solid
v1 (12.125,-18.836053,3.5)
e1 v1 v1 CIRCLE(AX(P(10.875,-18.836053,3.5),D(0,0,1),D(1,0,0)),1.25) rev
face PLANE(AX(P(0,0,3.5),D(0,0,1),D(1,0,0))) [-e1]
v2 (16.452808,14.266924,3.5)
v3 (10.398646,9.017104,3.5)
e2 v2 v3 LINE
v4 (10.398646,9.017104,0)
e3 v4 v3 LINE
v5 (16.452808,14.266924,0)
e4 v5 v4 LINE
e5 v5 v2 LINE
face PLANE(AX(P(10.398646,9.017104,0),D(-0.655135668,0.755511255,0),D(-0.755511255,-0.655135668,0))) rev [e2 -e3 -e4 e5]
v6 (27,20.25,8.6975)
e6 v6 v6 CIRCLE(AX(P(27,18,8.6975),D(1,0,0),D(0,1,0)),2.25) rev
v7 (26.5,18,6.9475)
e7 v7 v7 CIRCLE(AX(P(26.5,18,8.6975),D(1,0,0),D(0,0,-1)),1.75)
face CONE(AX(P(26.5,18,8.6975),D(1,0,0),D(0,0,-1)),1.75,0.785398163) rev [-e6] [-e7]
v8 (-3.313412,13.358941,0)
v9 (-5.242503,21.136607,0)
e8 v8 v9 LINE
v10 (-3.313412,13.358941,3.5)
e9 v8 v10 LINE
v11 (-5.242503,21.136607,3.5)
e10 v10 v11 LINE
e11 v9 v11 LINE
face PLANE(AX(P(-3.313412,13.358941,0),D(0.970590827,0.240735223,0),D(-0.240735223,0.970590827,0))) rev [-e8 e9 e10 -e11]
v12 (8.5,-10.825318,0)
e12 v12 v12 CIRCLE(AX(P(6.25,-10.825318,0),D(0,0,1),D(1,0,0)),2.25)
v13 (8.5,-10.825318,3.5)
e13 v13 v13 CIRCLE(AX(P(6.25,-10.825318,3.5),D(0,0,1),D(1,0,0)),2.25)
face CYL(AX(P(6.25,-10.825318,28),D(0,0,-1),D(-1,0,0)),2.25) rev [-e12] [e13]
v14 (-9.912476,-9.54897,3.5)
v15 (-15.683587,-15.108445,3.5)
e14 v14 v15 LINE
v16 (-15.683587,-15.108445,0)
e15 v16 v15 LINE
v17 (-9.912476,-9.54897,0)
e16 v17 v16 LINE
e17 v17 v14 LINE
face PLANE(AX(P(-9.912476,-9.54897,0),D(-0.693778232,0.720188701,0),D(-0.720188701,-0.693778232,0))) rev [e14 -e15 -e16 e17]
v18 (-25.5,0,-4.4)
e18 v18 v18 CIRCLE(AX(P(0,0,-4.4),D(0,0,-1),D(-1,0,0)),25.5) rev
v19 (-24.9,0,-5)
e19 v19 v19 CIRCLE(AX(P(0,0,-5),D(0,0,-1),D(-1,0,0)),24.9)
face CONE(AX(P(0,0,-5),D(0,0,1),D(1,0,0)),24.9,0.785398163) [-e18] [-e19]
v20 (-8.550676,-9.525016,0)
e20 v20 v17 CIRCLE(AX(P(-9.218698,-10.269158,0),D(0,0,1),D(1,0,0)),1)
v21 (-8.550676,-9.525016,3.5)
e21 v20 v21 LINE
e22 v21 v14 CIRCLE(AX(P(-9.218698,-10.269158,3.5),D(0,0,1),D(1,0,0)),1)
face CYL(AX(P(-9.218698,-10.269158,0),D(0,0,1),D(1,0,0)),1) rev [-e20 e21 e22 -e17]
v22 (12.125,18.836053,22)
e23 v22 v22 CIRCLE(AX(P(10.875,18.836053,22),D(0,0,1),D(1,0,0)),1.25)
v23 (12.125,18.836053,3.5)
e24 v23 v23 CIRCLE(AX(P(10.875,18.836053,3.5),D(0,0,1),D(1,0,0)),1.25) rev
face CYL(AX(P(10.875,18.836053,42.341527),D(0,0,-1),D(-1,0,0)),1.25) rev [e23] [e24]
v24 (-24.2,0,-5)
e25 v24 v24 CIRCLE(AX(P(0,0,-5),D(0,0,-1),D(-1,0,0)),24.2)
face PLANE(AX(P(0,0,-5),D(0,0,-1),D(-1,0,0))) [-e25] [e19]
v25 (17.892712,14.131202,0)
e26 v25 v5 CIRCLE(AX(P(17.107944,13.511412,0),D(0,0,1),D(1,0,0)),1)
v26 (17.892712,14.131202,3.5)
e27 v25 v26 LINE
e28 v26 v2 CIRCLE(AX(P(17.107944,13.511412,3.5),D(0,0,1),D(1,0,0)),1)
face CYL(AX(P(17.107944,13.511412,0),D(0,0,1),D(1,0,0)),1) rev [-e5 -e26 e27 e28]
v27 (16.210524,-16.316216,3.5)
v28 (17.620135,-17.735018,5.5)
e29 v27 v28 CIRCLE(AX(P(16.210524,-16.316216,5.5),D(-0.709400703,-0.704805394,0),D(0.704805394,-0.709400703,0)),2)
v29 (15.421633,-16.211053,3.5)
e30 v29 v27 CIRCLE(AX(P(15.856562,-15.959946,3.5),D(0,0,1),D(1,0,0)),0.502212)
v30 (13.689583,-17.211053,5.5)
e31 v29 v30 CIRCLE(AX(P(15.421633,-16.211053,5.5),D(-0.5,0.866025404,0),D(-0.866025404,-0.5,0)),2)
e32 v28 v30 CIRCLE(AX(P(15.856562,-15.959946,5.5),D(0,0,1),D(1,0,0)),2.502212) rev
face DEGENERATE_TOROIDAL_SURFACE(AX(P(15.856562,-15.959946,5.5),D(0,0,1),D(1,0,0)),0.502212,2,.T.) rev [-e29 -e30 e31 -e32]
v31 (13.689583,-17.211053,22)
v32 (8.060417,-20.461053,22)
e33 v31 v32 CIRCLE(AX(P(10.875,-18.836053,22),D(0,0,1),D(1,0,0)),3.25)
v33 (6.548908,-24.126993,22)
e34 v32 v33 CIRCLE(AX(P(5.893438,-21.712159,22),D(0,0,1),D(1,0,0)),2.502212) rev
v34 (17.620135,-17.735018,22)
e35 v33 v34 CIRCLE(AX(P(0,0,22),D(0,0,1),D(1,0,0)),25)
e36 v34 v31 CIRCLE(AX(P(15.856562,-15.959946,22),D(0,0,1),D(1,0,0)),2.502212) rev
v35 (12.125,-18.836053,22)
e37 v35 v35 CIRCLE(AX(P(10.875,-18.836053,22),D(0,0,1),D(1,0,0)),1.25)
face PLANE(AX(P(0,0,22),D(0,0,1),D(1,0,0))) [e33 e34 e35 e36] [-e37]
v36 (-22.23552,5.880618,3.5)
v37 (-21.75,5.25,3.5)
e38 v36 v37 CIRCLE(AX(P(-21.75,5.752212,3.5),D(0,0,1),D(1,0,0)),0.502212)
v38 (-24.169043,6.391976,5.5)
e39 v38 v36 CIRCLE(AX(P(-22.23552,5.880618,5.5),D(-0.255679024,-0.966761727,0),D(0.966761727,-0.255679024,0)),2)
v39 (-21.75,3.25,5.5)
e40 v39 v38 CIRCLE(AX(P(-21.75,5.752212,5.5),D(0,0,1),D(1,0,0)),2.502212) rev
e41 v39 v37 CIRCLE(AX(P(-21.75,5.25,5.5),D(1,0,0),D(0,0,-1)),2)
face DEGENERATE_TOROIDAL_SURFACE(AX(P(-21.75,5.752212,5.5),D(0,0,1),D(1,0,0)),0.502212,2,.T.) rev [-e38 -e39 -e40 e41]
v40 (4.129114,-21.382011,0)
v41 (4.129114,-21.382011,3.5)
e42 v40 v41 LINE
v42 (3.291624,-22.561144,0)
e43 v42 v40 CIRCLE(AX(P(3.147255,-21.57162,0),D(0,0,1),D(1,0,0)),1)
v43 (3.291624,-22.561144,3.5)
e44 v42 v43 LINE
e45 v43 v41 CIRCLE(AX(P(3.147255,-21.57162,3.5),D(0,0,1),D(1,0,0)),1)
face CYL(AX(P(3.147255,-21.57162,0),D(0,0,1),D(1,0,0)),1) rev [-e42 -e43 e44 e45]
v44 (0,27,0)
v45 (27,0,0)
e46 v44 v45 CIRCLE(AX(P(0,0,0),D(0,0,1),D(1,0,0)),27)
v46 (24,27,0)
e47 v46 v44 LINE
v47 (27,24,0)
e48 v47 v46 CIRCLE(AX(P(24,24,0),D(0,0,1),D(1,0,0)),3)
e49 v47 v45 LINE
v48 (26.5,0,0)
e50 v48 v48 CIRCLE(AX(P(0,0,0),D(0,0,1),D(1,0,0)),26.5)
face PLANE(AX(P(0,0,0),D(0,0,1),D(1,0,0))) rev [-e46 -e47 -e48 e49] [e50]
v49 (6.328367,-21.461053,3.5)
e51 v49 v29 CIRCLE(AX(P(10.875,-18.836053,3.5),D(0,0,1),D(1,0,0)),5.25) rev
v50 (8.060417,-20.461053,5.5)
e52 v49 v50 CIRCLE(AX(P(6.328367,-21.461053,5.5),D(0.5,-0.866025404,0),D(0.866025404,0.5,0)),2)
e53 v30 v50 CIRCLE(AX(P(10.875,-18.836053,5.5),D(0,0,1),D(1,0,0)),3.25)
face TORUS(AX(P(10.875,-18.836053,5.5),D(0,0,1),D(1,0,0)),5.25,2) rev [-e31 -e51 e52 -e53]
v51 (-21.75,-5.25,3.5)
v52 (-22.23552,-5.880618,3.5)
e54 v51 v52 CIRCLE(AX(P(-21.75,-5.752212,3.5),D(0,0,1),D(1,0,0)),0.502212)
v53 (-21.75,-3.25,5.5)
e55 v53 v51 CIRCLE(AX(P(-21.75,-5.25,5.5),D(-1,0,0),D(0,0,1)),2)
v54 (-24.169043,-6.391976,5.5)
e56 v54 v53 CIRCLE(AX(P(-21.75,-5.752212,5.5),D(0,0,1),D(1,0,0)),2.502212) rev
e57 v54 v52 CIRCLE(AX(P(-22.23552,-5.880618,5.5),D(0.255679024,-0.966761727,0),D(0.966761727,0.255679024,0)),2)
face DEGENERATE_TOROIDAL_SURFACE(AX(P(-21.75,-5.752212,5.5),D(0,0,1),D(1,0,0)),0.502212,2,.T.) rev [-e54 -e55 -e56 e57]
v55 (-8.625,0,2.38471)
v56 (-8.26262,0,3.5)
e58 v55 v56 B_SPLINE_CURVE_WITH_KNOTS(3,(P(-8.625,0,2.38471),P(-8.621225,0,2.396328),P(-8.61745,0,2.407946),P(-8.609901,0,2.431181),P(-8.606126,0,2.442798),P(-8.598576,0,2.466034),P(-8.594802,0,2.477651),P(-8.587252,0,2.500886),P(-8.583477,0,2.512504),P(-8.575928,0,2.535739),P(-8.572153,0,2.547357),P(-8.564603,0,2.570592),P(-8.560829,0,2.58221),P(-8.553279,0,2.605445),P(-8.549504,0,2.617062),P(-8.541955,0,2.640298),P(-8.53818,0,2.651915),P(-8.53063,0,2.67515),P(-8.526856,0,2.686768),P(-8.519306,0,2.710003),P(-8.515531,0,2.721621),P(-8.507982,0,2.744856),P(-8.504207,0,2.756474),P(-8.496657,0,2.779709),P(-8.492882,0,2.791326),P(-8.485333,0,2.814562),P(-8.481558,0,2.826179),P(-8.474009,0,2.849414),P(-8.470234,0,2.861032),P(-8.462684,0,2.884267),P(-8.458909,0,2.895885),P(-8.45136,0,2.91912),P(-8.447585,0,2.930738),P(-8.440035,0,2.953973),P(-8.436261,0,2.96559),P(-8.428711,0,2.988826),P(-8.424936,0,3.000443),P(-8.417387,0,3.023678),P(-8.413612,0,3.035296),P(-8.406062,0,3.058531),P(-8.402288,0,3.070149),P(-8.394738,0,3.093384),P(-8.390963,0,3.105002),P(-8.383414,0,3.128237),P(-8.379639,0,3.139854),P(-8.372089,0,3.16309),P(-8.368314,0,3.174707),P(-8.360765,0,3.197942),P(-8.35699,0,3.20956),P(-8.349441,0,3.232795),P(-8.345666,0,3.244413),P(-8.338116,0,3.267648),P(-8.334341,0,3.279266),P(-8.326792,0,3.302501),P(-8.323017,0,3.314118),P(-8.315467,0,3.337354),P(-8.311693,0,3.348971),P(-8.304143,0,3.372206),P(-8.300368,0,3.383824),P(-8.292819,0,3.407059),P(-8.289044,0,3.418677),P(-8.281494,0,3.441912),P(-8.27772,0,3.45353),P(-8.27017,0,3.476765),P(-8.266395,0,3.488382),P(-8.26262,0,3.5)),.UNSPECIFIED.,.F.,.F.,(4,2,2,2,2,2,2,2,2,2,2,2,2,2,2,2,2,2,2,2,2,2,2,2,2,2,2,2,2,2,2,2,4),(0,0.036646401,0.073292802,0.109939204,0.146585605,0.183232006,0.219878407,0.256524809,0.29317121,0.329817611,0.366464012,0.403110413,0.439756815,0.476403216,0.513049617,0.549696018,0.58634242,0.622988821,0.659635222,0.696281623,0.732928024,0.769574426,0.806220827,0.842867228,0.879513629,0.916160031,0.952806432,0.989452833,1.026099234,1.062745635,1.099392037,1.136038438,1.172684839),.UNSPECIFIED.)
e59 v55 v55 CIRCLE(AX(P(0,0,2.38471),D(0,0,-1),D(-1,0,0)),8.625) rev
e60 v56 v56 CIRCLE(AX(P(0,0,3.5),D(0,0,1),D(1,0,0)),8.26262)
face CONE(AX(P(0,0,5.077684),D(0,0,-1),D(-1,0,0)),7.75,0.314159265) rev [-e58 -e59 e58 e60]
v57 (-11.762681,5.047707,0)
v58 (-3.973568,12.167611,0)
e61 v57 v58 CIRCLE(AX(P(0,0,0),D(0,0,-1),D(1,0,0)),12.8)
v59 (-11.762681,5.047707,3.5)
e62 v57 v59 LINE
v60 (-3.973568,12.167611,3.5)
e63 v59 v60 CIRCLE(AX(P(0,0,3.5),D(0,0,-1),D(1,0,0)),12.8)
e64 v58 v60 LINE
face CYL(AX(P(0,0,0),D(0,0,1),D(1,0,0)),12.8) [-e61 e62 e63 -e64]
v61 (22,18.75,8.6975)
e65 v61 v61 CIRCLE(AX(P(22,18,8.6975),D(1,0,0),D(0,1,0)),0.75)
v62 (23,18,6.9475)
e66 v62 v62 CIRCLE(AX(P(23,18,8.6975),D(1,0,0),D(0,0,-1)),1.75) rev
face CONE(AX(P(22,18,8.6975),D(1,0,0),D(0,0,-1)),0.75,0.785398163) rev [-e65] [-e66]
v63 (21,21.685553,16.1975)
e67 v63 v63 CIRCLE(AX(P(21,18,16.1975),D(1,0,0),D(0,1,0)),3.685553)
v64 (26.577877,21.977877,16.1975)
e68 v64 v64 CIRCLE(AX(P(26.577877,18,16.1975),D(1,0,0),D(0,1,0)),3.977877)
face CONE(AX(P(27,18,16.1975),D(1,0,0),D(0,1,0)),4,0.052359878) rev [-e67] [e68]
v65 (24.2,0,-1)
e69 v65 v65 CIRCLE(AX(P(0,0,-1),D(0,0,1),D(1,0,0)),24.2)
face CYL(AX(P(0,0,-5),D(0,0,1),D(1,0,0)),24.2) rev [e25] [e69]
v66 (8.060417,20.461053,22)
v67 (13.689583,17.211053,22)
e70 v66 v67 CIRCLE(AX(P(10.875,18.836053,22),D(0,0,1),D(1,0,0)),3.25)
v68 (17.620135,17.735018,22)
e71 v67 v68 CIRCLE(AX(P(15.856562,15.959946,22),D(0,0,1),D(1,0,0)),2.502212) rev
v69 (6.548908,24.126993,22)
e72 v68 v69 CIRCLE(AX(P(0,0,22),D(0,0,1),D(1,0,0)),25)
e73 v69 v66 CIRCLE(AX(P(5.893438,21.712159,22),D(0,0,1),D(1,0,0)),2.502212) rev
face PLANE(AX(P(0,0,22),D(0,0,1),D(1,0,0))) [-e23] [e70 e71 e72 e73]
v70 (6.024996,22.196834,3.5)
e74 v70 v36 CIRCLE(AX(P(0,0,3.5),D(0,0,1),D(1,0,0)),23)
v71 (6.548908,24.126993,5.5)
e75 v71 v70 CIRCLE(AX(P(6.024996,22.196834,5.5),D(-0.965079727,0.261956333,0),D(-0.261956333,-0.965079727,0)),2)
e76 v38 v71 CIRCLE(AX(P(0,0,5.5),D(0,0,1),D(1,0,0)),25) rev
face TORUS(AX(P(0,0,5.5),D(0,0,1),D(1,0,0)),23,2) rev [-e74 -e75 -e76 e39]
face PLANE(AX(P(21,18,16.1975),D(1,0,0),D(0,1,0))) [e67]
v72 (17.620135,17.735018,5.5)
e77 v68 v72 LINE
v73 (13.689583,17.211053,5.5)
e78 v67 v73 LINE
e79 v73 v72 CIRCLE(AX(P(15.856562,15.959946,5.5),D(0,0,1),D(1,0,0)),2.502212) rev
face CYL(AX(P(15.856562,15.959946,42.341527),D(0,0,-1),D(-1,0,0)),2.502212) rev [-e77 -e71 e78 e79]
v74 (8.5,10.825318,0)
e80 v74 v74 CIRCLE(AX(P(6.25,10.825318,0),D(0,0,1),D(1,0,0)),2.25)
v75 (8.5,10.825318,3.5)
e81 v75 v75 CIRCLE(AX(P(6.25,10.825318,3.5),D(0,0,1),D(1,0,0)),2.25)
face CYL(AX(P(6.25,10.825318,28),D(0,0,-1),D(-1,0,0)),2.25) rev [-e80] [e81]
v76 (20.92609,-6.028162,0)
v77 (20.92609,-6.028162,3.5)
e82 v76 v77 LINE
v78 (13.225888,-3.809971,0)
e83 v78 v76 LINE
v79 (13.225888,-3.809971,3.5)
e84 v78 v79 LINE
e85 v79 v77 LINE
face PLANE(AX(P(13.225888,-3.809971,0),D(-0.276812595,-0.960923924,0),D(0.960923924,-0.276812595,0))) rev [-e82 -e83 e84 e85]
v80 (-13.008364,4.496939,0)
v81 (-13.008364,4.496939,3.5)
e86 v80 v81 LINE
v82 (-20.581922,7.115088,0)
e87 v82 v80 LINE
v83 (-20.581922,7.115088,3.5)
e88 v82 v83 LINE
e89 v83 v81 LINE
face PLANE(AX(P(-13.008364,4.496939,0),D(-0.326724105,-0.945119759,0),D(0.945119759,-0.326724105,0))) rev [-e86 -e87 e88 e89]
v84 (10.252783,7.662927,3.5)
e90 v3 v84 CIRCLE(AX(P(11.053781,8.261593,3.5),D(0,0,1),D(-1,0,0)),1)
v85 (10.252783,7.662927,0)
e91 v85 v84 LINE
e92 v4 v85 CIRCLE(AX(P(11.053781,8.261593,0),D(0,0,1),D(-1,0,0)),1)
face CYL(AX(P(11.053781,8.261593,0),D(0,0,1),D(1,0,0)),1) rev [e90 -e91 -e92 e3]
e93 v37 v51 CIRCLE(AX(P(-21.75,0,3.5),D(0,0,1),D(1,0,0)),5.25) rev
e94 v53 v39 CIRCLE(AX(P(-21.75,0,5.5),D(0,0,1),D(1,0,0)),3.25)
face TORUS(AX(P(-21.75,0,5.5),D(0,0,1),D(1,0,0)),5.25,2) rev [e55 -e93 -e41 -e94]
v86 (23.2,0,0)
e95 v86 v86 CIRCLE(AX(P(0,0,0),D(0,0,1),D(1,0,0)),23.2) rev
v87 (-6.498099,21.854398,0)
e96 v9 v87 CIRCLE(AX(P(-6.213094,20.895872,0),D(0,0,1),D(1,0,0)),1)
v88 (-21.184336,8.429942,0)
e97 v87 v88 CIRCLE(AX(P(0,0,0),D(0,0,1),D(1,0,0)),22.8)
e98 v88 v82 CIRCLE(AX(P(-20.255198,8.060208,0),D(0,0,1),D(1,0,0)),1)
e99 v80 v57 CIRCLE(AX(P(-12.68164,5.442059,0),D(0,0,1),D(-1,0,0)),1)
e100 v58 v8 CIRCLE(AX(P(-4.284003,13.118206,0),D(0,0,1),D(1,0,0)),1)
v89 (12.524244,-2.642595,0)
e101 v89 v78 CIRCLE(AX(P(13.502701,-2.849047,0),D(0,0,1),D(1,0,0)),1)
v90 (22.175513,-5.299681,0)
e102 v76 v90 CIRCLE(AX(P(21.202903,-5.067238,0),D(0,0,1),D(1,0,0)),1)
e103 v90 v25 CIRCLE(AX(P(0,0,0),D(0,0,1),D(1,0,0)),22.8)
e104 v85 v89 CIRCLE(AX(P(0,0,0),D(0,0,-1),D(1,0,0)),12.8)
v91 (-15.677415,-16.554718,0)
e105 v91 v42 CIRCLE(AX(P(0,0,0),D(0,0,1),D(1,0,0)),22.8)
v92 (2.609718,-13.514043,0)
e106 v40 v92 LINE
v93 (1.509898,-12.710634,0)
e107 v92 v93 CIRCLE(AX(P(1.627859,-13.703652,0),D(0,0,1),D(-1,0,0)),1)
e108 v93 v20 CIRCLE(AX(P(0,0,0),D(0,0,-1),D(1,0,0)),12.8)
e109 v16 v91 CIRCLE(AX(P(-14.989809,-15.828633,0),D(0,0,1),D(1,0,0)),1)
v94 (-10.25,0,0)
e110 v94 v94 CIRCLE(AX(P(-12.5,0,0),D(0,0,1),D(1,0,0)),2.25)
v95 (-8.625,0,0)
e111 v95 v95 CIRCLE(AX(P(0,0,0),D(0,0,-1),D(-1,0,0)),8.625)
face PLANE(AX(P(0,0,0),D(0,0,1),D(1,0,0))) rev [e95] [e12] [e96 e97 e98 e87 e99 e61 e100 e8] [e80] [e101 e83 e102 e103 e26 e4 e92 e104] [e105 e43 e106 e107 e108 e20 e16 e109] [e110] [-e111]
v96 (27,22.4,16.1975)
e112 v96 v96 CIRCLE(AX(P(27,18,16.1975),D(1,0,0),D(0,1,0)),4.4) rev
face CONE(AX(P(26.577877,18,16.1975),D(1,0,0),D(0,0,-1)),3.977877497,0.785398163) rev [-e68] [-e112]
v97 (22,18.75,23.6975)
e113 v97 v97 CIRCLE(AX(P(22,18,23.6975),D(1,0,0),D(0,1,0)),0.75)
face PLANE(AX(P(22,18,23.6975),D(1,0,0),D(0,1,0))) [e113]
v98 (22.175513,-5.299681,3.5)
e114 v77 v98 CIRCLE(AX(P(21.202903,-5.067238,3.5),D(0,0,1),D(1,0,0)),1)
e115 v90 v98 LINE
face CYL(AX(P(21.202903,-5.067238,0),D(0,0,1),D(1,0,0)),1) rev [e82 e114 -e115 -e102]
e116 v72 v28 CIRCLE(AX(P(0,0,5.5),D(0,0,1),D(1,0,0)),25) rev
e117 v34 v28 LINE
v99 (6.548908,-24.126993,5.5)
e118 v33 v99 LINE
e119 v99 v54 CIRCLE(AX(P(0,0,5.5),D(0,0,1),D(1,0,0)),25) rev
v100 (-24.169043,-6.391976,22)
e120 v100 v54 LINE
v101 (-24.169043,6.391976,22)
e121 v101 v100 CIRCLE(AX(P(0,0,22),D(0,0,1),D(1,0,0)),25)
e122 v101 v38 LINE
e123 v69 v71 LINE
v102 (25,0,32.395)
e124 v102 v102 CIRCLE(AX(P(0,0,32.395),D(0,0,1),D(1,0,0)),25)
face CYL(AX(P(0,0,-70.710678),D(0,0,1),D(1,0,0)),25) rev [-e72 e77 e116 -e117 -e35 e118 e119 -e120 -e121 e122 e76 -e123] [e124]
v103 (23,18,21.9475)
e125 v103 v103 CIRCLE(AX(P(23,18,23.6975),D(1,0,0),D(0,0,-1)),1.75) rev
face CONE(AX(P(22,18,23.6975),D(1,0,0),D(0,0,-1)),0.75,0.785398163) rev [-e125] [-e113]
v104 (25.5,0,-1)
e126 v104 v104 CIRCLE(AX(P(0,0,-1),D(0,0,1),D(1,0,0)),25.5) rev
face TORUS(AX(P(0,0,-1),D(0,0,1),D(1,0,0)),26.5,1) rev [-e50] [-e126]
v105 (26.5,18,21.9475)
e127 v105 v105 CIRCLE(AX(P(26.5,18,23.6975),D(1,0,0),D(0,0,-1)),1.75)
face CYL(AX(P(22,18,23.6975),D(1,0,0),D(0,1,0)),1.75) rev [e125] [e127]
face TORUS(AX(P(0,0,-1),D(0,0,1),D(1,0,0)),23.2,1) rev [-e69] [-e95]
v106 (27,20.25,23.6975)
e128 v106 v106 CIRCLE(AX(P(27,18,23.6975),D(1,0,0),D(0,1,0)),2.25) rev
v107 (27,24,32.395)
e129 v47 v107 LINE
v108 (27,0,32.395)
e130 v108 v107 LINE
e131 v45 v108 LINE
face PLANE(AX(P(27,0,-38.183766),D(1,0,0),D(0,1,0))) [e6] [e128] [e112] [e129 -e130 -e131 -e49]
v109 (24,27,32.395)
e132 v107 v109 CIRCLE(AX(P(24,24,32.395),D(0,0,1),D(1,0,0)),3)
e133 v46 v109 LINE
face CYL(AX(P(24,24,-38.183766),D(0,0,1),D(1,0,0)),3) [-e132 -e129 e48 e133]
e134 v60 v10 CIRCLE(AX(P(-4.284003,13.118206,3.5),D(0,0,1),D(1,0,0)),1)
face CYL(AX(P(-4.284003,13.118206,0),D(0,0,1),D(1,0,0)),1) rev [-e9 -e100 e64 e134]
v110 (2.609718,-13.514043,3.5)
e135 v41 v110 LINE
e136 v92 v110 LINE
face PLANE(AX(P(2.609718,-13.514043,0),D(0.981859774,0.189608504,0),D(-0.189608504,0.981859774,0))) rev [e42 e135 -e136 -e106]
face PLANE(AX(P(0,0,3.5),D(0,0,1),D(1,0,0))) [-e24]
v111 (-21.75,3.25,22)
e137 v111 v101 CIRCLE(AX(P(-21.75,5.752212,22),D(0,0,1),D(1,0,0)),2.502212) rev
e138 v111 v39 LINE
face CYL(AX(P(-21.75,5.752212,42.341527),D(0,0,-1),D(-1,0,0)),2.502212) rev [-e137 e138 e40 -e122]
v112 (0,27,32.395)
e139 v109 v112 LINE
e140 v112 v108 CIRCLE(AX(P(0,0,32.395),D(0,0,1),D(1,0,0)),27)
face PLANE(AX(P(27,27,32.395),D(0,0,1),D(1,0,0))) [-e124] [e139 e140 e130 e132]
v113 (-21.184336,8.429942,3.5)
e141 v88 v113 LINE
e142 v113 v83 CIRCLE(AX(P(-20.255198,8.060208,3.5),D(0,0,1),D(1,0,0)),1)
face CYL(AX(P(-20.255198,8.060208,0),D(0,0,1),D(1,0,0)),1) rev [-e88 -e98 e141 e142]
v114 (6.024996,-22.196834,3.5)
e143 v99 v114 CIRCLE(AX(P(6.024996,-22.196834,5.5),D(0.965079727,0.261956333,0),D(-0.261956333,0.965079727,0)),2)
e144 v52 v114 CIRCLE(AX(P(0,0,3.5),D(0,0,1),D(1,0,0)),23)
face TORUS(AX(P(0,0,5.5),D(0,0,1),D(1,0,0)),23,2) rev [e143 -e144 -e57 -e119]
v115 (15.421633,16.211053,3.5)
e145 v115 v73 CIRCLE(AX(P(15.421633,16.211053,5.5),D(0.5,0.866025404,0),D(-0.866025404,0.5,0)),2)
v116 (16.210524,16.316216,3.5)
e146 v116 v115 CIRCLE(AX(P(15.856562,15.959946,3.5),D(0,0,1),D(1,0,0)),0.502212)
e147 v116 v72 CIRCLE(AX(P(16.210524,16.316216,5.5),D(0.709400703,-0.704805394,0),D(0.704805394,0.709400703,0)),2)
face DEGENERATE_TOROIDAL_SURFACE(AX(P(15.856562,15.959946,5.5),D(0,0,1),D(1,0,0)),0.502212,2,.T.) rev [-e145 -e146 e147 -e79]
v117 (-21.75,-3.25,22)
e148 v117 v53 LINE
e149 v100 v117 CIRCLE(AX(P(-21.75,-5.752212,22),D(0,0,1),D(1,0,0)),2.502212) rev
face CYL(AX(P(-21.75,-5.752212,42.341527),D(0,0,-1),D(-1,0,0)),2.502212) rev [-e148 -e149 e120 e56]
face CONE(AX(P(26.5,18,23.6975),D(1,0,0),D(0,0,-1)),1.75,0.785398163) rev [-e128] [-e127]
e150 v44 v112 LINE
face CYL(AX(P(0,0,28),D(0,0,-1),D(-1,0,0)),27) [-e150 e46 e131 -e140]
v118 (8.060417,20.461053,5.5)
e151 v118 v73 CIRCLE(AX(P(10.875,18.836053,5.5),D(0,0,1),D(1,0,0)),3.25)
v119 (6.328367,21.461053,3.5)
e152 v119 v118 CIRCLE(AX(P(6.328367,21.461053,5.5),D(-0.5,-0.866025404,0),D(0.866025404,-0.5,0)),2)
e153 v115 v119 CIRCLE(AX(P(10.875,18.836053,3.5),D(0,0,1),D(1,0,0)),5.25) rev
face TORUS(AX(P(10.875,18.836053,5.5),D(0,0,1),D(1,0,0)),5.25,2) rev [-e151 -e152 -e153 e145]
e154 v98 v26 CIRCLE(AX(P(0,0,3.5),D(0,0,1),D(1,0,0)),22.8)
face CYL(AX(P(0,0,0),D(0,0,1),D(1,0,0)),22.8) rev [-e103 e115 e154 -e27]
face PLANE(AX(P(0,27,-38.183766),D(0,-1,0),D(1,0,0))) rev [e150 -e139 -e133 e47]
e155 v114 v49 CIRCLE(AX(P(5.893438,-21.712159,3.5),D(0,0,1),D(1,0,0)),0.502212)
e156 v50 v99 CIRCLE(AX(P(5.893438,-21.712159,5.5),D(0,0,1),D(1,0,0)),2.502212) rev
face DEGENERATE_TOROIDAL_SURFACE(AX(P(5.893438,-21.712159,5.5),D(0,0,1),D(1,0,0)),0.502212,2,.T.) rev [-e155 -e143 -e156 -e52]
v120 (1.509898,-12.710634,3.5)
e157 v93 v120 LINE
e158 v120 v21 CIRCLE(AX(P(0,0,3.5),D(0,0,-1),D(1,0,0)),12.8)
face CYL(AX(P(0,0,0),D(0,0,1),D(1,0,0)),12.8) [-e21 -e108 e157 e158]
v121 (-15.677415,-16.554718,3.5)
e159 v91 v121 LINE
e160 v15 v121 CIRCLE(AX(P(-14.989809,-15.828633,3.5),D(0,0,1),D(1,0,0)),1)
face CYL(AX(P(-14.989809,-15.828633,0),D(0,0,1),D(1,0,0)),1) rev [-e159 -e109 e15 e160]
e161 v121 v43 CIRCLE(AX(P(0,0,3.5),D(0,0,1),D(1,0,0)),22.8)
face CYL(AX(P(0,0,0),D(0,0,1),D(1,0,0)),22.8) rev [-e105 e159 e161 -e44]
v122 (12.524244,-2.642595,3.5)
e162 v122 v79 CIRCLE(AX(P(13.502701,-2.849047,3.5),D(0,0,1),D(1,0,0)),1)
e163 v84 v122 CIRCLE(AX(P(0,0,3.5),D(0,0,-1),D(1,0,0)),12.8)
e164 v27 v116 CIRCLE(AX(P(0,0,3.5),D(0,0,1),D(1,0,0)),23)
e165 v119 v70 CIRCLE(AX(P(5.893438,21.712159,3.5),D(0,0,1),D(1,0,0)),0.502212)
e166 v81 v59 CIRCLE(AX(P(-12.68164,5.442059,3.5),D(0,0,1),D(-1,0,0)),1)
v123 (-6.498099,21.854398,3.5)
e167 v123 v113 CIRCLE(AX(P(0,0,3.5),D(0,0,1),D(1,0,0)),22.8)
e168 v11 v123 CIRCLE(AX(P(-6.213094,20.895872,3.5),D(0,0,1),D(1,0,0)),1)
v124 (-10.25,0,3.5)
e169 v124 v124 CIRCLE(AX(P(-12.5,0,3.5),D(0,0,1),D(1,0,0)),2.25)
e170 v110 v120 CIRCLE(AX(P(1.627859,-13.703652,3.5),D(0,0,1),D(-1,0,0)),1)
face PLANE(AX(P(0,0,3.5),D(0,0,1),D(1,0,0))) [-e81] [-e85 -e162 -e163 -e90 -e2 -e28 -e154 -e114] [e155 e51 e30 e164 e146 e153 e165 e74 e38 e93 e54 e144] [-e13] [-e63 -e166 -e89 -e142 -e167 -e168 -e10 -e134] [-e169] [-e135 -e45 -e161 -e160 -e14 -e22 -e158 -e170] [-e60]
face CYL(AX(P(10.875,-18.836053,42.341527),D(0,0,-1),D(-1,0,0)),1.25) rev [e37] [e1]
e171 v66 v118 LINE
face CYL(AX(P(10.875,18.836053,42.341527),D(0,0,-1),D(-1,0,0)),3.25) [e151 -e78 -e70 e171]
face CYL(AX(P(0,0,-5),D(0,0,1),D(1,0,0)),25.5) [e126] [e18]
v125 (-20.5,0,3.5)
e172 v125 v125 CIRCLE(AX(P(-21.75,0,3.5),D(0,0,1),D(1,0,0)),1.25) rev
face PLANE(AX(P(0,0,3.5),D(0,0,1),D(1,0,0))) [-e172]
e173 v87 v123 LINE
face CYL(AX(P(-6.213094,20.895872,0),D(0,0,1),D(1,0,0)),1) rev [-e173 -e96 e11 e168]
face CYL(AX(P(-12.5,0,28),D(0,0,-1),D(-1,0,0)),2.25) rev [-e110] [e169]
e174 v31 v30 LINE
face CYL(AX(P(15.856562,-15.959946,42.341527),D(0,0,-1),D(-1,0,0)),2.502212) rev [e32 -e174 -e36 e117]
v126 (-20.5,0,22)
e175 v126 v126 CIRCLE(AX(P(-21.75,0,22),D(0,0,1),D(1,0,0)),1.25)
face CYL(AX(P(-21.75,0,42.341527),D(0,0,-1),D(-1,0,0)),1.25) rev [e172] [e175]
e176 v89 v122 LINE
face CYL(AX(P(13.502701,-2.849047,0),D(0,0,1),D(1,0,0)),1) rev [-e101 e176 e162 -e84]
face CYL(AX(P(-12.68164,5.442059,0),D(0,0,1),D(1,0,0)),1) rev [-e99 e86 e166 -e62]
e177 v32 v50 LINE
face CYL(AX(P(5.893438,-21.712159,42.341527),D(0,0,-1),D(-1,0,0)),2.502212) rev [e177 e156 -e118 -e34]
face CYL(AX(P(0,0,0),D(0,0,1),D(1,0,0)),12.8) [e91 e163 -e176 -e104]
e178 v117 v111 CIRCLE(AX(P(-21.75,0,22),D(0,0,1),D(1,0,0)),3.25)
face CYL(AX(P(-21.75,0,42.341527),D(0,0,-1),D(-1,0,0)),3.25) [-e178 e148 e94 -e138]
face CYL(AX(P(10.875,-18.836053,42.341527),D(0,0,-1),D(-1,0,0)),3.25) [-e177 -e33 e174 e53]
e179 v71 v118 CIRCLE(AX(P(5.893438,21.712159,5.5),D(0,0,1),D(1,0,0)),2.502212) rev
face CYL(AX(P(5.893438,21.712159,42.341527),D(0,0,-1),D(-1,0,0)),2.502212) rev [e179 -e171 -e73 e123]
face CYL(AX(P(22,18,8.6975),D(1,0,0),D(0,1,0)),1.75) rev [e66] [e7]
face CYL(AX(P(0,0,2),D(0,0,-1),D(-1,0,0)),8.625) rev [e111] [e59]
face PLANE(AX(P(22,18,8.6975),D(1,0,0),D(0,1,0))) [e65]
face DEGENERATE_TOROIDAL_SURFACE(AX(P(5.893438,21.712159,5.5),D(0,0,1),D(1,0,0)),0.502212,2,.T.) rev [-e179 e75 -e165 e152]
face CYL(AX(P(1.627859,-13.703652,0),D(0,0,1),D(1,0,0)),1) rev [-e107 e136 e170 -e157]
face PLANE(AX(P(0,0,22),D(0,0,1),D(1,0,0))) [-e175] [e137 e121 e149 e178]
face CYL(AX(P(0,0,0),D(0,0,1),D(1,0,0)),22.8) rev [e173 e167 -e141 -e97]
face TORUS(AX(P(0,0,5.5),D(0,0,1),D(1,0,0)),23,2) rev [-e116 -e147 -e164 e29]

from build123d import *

# Parameters (mm, degrees)
SKETCH1_R           = 27
SKETCH1_R_2         = 7.75
SKETCH1_R_3         = 2.25
BOSS_EXTRUDE1_DEPTH = 28
SKETCH2_R           = 3.75
CUT_EXTRUDE1_DEPTH  = 23.5
BOSS_EXTRUDE2_START = -28
BOSS_EXTRUDE2_DEPTH = 28
SKETCH8_R           = 8.625
CUT_EXTRUDE5_DEPTH  = 2
CHAMFER2_SIZE       = 3.077683537
CHAMFER2_SIZE_2     = 1
SKETCH9_R           = 25
CUT_EXTRUDE6_DEPTH  = 24.5
CUT_EXTRUDE7_DEPTH  = 46.367940222
SKETCH13_R          = 25.5
SKETCH13_R_2        = 24.2
BOSS_EXTRUDE3_DEPTH = 5
FILLET2_R           = 1
CHAMFER3_SIZE       = 0.6
BOSS_EXTRUDE4_START = 18.5
SKETCH14_R          = 1.25
BOSS_EXTRUDE4_DEPTH = 18.5
FILLET4_R           = 2
SKETCH16_R          = 25
BOSS_EXTRUDE5_DEPTH = 4.395
SKETCH6_R           = 4
CUT_EXTRUDE4_DEPTH  = 6
CUT_EXTRUDE4_DRAFT  = -3
FILLET3_R           = 1
SKETCH17_R          = 1.75
CUT_EXTRUDE8_DEPTH  = 5
CHAMFER4_SIZE       = 1
CHAMFER5_SIZE       = 0.5
CHAMFER6_SIZE       = 0.4
CHAMFER6_SIZE2      = 0.422701801


with BuildPart() as part:
    # Sketch1 → Boss-Extrude1 (new body)
    with BuildSketch(Plane.XY):
        Circle(SKETCH1_R)
        Circle(SKETCH1_R_2, mode=Mode.SUBTRACT)
        with Locations((6.25, 10.825317547)):
            Circle(SKETCH1_R_3, mode=Mode.SUBTRACT)
        with Locations((-12.5, 0)):
            Circle(SKETCH1_R_3, mode=Mode.SUBTRACT)
        with Locations((6.25, -10.825317547)):
            Circle(SKETCH1_R_3, mode=Mode.SUBTRACT)
    extrude(amount=BOSS_EXTRUDE1_DEPTH)

    # Sketch2 → Cut-Extrude1 (cut)
    with BuildSketch(Plane.XY.offset(28)):
        with Locations((6.25, 10.825317547)):
            Circle(SKETCH2_R)
        with Locations((6.25, -10.825317547)):
            Circle(SKETCH2_R)
        with Locations((-12.5, 0)):
            Circle(SKETCH2_R)
    extrude(amount=-CUT_EXTRUDE1_DEPTH, mode=Mode.SUBTRACT)

    # Sketch5 → Boss-Extrude2 (add)
    with BuildSketch(Plane.XY.offset(28).offset(BOSS_EXTRUDE2_START)):
        with BuildLine():
            Line((24, 27), (0, 27))
            ThreePointArc((0, 27), (19.091883092, 19.091883092), (27, 0))
            Line((27, 0), (27, 24))
            ThreePointArc((27, 24), (26.121320344, 26.121320344), (24, 27))
        make_face()
    extrude(amount=BOSS_EXTRUDE2_DEPTH)

    # Sketch8 → Cut-Extrude5 (cut)
    with BuildSketch(Plane(origin=(0, 0, 0), x_dir=(-1, 0, 0), z_dir=(0, 0, -1))):
        Circle(SKETCH8_R)
    extrude(amount=-CUT_EXTRUDE5_DEPTH, mode=Mode.SUBTRACT)

    # Chamfer2
    # the kernel refuses this chamfer: 3.077683537, 1 mm, written as the material it takes off along each edge
    with BuildSketch(Plane(origin=(0, 0, 2), x_dir=(1, 0, 0), z_dir=(0, 1, 0))) as chamfer2_piece_1_section:
        Polygon((7.75, -CHAMFER2_SIZE), (7.75 + CHAMFER2_SIZE_2, 0), (7.75, 0), align=None)
    chamfer2_piece_1 = revolve(axis=Axis((0, 0, 2), (0, 0, -1)), mode=Mode.PRIVATE)
    chamfer2_piece_1 = chamfer2_piece_1 & Plane(origin=(0, 0, 3.775868396), x_dir=(-1, 0, 0), z_dir=(0, 0, -1)) * Cylinder(8.625, 35, mode=Mode.PRIVATE)
    add(chamfer2_piece_1, mode=Mode.SUBTRACT)

    # Sketch9 → Cut-Extrude6 (cut)
    with BuildSketch(Plane.XY.offset(28)):
        Circle(SKETCH9_R)
    extrude(amount=-CUT_EXTRUDE6_DEPTH, mode=Mode.SUBTRACT)

    # Sketch11 → Cut-Extrude7 (cut, through all)
    with BuildSketch(Plane.XY.offset(3.5)):
        with BuildLine():
            Line((-3.313412303, 13.358940786), (-5.242503498, 21.136607038))
            ThreePointArc((-5.242503498, 21.136607038), (-5.716794824, 21.764023187), (-6.498098652, 21.854398045))
            ThreePointArc((-6.498098652, 21.854398045), (-15.382889794, 16.828746286), (-21.184335701, 8.429941928))
            ThreePointArc((-21.184335701, 8.429941928), (-21.164322698, 7.643683214), (-20.581922275, 7.115087874))
            Line((-20.581922275, 7.115087874), (-13.008364135, 4.49693924))
            ThreePointArc((-13.008364135, 4.49693924), (-12.277261592, 4.527467244), (-11.762680607, 5.047706898))
            ThreePointArc((-11.762680607, 5.047706898), (-8.636008306, 9.447717213), (-3.97356812, 12.167610957))
            ThreePointArc((-3.97356812, 12.167610957), (-3.409318336, 12.63351338), (-3.313412303, 13.358940786))
        make_face()
        with BuildLine():
            Line((10.398645689, 9.017104182), (16.452807987, 14.266923612))
            ThreePointArc((16.452807987, 14.266923612), (17.201785191, 14.506999504), (17.892711713, 14.131201915))
            ThreePointArc((17.892711713, 14.131201915), (22.265566695, 4.907600202), (22.175513217, -5.299680514))
            ThreePointArc((22.175513217, -5.299680514), (21.706594381, -5.931122048), (20.926090394, -6.02816231))
            Line((20.926090394, -6.02816231), (13.225888239, -3.809971165))
            ThreePointArc((13.225888239, -3.809971165), (12.645602694, -3.364200402), (12.524244252, -2.642594543))
            ThreePointArc((12.524244252, -2.642594543), (12.499967267, 2.755143973), (10.252782708, 7.662926774))
            ThreePointArc((10.252782708, 7.662926774), (10.059532444, 8.368686806), (10.398645689, 9.017104182))
        make_face()
        with BuildLine():
            Line((2.609718446, -13.514043423), (4.129114288, -21.382011486))
            ThreePointArc((4.129114288, -21.382011486), (3.962537507, -22.150682718), (3.291623988, -22.561143843))
            ThreePointArc((3.291623988, -22.561143843), (-6.882676901, -21.736346489), (-15.677414566, -16.554717531))
            ThreePointArc((-15.677414566, -16.554717531), (-15.989799557, -15.832901139), (-15.683586895, -15.108444728))
            Line((-15.683586895, -15.108444728), (-9.912475936, -9.54896962))
            ThreePointArc((-9.912475936, -9.54896962), (-9.236284359, -9.269312979), (-8.550676132, -9.525016414))
            ThreePointArc((-8.550676132, -9.525016414), (-3.863958962, -12.202861187), (1.509897899, -12.710633672))
            ThreePointArc((1.509897899, -12.710633672), (2.217729148, -12.89615405), (2.609718446, -13.514043423))
        make_face()
    extrude(amount=-CUT_EXTRUDE7_DEPTH, mode=Mode.SUBTRACT)

    # Sketch13 → Boss-Extrude3 (add)
    with BuildSketch(Plane(origin=(0, 0, 0), x_dir=(-1, 0, 0), z_dir=(0, 0, -1))):
        with Locations(Location((0, 0, 0), (0, 0, 180))):
            Circle(SKETCH13_R)
        Circle(SKETCH13_R_2, mode=Mode.SUBTRACT)
    extrude(amount=BOSS_EXTRUDE3_DEPTH)

    # Fillet2
    fillet2_edges = [part.edges().sort_by_distance(p)[0] for p in [
        (24.2, 0, 0),
    ]]
    fillet(fillet2_edges, radius=FILLET2_R)

    # Chamfer3
    chamfer3_edges = [part.edges().sort_by_distance(p)[0] for p in [
        (-25.5, 0, -5),
    ]]
    chamfer(chamfer3_edges, length=CHAMFER3_SIZE)

    # Sketch14 → Boss-Extrude4 (add)
    # profile 1 of 3: a face of its own
    with BuildSketch(Plane.XY.offset(3.5).offset(BOSS_EXTRUDE4_START)):
        with BuildLine():
            ThreePointArc((-21.75, 3.25), (-23.732661129, 4.225738777), (-24.16904317, 6.391975612))
            ThreePointArc((-24.16904317, 6.391975612), (-25, 0), (-24.16904317, -6.391975612))
            ThreePointArc((-24.16904317, -6.391975612), (-23.732661129, -4.225738777), (-21.75, -3.25))
            ThreePointArc((-21.75, -3.25), (-18.5, 0), (-21.75, 3.25))
        make_face()
        with Locations((-21.75, 0)):
            Circle(SKETCH14_R, mode=Mode.SUBTRACT)
    # profile 2 of 3: a face of its own
    with BuildSketch(Plane.XY.offset(3.5).offset(BOSS_EXTRUDE4_START)):
        with BuildLine():
            ThreePointArc((13.689582562, 17.211052532), (15.525927695, 18.440218049), (17.620134846, 17.735017565))
            ThreePointArc((17.620134846, 17.735017565), (12.5, 21.650635095), (6.548908325, 24.126993177))
            ThreePointArc((6.548908325, 24.126993177), (8.206733434, 22.665956825), (8.060417438, 20.461052532))
            ThreePointArc((8.060417438, 20.461052532), (9.25, 16.02146997), (13.689582562, 17.211052532))
        make_face()
        with Locations((10.875, 18.836052532)):
            Circle(SKETCH14_R, mode=Mode.SUBTRACT)
    # profile 3 of 3: a face of its own
    with BuildSketch(Plane.XY.offset(3.5).offset(BOSS_EXTRUDE4_START)):
        with BuildLine():
            ThreePointArc((8.060417438, -20.461052532), (8.206733434, -22.665956825), (6.548908325, -24.126993177))
            ThreePointArc((6.548908325, -24.126993177), (12.5, -21.650635095), (17.620134846, -17.735017565))
            ThreePointArc((17.620134846, -17.735017565), (15.525927695, -18.440218049), (13.689582562, -17.211052532))
            ThreePointArc((13.689582562, -17.211052532), (9.25, -16.02146997), (8.060417438, -20.461052532))
        make_face()
        with Locations((10.875, -18.836052532)):
            Circle(SKETCH14_R, mode=Mode.SUBTRACT)
    extrude(amount=-BOSS_EXTRUDE4_DEPTH)

    # Fillet4
    fillet4_edges = [part.edges().sort_by_distance(p)[0] for p in [
        (-12.5, -21.650635095, 3.5),
        (-12.5, 21.650635095, 3.5),
        (23.081414289, -9.604598608, 3.5),
        (-23.732661129, -4.225738777, 3.5),
        (-23.732661129, 4.225738777, 3.5),
        (-18.5, 0, 3.5),
        (8.206733434, 22.665956825, 3.5),
        (15.525927695, 18.440218049, 3.5),
        (9.25, 16.02146997, 3.5),
        (15.525927695, -18.440218049, 3.5),
        (8.206733434, -22.665956825, 3.5),
        (9.25, -16.02146997, 3.5),
    ]]
    fillet(fillet4_edges, radius=FILLET4_R)

    # Sketch16 → Boss-Extrude5 (add)
    with BuildSketch(Plane.XY.offset(28)):
        with BuildLine():
            Line((27, 0), (27, 24))
            ThreePointArc((27, 24), (26.121320344, 26.121320344), (24, 27))
            Line((24, 27), (0, 27))
            ThreePointArc((0, 27), (-19.091883092, -19.091883092), (27, 0))
        make_face()
        Circle(SKETCH16_R, mode=Mode.SUBTRACT)
    extrude(amount=BOSS_EXTRUDE5_DEPTH)


with BuildPart() as cut_extrude4_tool:
    # Sketch6 → Cut-Extrude4 (with draft: the straight prism first)
    with BuildSketch(Plane(origin=(27, 0, 0), x_dir=(0, 0, -1), z_dir=(1, 0, 0))):
        with Locations((-16.1975, 18)):
            Circle(SKETCH6_R)
    extrude(amount=-CUT_EXTRUDE4_DEPTH)
    # Cut-Extrude4: the draft: its side faces are tilted about the plane it starts from
    cut_extrude4_sides = [cut_extrude4_tool.faces().sort_by_distance(p)[0] for p in [
        (24, 18, 20.1975),
    ]]
    draft(cut_extrude4_sides, Plane(origin=(27, 0, 0), x_dir=(0, 0, -1), z_dir=(1, 0, 0)), CUT_EXTRUDE4_DRAFT)


with BuildPart() as part_1:
    add(part.part)

    # Cut-Extrude4: cut by cut_extrude4_tool
    add(cut_extrude4_tool.part, mode=Mode.SUBTRACT)

    # Fillet3
    fillet3_edges = [part_1.edges().sort_by_distance(p)[0] for p in [
        (-25.5, 0, 0),
    ]]
    fillet(fillet3_edges, radius=FILLET3_R)

    # Sketch17 → Cut-Extrude8 (cut)
    with BuildSketch(Plane(origin=(27, 0, 0), x_dir=(0, 0, -1), z_dir=(1, 0, 0))):
        with Locations(Location((-23.6975, 18, 0), (0, 0, 90))):
            Circle(SKETCH17_R)
        with Locations(Location((-8.6975, 18, 0), (0, 0, 90))):
            Circle(SKETCH17_R)
    extrude(amount=-CUT_EXTRUDE8_DEPTH, mode=Mode.SUBTRACT)

    # Chamfer4
    chamfer4_edges = [part_1.edges().sort_by_distance(p)[0] for p in [
        (22, 16.25, 23.6975),
        (22, 16.25, 8.6975),
    ]]
    chamfer(chamfer4_edges, length=CHAMFER4_SIZE)

    # Chamfer5
    chamfer5_edges = [part_1.edges().sort_by_distance(p)[0] for p in [
        (27, 16.25, 23.6975),
        (27, 16.25, 8.6975),
    ]]
    chamfer(chamfer5_edges, length=CHAMFER5_SIZE)

    # Chamfer6
    chamfer6_edges = [part_1.edges().sort_by_distance(p)[0] for p in [
        (27, 18, 20.1975),
    ]]
    chamfer6_side = [part_1.faces().sort_by_distance(p)[0] for p in [
        (27, 11.291860115, 16.1975),
    ]]
    chamfer(chamfer6_edges, length=CHAMFER6_SIZE, length2=CHAMFER6_SIZE2, reference=chamfer6_side[0])


solid = part_1.part
